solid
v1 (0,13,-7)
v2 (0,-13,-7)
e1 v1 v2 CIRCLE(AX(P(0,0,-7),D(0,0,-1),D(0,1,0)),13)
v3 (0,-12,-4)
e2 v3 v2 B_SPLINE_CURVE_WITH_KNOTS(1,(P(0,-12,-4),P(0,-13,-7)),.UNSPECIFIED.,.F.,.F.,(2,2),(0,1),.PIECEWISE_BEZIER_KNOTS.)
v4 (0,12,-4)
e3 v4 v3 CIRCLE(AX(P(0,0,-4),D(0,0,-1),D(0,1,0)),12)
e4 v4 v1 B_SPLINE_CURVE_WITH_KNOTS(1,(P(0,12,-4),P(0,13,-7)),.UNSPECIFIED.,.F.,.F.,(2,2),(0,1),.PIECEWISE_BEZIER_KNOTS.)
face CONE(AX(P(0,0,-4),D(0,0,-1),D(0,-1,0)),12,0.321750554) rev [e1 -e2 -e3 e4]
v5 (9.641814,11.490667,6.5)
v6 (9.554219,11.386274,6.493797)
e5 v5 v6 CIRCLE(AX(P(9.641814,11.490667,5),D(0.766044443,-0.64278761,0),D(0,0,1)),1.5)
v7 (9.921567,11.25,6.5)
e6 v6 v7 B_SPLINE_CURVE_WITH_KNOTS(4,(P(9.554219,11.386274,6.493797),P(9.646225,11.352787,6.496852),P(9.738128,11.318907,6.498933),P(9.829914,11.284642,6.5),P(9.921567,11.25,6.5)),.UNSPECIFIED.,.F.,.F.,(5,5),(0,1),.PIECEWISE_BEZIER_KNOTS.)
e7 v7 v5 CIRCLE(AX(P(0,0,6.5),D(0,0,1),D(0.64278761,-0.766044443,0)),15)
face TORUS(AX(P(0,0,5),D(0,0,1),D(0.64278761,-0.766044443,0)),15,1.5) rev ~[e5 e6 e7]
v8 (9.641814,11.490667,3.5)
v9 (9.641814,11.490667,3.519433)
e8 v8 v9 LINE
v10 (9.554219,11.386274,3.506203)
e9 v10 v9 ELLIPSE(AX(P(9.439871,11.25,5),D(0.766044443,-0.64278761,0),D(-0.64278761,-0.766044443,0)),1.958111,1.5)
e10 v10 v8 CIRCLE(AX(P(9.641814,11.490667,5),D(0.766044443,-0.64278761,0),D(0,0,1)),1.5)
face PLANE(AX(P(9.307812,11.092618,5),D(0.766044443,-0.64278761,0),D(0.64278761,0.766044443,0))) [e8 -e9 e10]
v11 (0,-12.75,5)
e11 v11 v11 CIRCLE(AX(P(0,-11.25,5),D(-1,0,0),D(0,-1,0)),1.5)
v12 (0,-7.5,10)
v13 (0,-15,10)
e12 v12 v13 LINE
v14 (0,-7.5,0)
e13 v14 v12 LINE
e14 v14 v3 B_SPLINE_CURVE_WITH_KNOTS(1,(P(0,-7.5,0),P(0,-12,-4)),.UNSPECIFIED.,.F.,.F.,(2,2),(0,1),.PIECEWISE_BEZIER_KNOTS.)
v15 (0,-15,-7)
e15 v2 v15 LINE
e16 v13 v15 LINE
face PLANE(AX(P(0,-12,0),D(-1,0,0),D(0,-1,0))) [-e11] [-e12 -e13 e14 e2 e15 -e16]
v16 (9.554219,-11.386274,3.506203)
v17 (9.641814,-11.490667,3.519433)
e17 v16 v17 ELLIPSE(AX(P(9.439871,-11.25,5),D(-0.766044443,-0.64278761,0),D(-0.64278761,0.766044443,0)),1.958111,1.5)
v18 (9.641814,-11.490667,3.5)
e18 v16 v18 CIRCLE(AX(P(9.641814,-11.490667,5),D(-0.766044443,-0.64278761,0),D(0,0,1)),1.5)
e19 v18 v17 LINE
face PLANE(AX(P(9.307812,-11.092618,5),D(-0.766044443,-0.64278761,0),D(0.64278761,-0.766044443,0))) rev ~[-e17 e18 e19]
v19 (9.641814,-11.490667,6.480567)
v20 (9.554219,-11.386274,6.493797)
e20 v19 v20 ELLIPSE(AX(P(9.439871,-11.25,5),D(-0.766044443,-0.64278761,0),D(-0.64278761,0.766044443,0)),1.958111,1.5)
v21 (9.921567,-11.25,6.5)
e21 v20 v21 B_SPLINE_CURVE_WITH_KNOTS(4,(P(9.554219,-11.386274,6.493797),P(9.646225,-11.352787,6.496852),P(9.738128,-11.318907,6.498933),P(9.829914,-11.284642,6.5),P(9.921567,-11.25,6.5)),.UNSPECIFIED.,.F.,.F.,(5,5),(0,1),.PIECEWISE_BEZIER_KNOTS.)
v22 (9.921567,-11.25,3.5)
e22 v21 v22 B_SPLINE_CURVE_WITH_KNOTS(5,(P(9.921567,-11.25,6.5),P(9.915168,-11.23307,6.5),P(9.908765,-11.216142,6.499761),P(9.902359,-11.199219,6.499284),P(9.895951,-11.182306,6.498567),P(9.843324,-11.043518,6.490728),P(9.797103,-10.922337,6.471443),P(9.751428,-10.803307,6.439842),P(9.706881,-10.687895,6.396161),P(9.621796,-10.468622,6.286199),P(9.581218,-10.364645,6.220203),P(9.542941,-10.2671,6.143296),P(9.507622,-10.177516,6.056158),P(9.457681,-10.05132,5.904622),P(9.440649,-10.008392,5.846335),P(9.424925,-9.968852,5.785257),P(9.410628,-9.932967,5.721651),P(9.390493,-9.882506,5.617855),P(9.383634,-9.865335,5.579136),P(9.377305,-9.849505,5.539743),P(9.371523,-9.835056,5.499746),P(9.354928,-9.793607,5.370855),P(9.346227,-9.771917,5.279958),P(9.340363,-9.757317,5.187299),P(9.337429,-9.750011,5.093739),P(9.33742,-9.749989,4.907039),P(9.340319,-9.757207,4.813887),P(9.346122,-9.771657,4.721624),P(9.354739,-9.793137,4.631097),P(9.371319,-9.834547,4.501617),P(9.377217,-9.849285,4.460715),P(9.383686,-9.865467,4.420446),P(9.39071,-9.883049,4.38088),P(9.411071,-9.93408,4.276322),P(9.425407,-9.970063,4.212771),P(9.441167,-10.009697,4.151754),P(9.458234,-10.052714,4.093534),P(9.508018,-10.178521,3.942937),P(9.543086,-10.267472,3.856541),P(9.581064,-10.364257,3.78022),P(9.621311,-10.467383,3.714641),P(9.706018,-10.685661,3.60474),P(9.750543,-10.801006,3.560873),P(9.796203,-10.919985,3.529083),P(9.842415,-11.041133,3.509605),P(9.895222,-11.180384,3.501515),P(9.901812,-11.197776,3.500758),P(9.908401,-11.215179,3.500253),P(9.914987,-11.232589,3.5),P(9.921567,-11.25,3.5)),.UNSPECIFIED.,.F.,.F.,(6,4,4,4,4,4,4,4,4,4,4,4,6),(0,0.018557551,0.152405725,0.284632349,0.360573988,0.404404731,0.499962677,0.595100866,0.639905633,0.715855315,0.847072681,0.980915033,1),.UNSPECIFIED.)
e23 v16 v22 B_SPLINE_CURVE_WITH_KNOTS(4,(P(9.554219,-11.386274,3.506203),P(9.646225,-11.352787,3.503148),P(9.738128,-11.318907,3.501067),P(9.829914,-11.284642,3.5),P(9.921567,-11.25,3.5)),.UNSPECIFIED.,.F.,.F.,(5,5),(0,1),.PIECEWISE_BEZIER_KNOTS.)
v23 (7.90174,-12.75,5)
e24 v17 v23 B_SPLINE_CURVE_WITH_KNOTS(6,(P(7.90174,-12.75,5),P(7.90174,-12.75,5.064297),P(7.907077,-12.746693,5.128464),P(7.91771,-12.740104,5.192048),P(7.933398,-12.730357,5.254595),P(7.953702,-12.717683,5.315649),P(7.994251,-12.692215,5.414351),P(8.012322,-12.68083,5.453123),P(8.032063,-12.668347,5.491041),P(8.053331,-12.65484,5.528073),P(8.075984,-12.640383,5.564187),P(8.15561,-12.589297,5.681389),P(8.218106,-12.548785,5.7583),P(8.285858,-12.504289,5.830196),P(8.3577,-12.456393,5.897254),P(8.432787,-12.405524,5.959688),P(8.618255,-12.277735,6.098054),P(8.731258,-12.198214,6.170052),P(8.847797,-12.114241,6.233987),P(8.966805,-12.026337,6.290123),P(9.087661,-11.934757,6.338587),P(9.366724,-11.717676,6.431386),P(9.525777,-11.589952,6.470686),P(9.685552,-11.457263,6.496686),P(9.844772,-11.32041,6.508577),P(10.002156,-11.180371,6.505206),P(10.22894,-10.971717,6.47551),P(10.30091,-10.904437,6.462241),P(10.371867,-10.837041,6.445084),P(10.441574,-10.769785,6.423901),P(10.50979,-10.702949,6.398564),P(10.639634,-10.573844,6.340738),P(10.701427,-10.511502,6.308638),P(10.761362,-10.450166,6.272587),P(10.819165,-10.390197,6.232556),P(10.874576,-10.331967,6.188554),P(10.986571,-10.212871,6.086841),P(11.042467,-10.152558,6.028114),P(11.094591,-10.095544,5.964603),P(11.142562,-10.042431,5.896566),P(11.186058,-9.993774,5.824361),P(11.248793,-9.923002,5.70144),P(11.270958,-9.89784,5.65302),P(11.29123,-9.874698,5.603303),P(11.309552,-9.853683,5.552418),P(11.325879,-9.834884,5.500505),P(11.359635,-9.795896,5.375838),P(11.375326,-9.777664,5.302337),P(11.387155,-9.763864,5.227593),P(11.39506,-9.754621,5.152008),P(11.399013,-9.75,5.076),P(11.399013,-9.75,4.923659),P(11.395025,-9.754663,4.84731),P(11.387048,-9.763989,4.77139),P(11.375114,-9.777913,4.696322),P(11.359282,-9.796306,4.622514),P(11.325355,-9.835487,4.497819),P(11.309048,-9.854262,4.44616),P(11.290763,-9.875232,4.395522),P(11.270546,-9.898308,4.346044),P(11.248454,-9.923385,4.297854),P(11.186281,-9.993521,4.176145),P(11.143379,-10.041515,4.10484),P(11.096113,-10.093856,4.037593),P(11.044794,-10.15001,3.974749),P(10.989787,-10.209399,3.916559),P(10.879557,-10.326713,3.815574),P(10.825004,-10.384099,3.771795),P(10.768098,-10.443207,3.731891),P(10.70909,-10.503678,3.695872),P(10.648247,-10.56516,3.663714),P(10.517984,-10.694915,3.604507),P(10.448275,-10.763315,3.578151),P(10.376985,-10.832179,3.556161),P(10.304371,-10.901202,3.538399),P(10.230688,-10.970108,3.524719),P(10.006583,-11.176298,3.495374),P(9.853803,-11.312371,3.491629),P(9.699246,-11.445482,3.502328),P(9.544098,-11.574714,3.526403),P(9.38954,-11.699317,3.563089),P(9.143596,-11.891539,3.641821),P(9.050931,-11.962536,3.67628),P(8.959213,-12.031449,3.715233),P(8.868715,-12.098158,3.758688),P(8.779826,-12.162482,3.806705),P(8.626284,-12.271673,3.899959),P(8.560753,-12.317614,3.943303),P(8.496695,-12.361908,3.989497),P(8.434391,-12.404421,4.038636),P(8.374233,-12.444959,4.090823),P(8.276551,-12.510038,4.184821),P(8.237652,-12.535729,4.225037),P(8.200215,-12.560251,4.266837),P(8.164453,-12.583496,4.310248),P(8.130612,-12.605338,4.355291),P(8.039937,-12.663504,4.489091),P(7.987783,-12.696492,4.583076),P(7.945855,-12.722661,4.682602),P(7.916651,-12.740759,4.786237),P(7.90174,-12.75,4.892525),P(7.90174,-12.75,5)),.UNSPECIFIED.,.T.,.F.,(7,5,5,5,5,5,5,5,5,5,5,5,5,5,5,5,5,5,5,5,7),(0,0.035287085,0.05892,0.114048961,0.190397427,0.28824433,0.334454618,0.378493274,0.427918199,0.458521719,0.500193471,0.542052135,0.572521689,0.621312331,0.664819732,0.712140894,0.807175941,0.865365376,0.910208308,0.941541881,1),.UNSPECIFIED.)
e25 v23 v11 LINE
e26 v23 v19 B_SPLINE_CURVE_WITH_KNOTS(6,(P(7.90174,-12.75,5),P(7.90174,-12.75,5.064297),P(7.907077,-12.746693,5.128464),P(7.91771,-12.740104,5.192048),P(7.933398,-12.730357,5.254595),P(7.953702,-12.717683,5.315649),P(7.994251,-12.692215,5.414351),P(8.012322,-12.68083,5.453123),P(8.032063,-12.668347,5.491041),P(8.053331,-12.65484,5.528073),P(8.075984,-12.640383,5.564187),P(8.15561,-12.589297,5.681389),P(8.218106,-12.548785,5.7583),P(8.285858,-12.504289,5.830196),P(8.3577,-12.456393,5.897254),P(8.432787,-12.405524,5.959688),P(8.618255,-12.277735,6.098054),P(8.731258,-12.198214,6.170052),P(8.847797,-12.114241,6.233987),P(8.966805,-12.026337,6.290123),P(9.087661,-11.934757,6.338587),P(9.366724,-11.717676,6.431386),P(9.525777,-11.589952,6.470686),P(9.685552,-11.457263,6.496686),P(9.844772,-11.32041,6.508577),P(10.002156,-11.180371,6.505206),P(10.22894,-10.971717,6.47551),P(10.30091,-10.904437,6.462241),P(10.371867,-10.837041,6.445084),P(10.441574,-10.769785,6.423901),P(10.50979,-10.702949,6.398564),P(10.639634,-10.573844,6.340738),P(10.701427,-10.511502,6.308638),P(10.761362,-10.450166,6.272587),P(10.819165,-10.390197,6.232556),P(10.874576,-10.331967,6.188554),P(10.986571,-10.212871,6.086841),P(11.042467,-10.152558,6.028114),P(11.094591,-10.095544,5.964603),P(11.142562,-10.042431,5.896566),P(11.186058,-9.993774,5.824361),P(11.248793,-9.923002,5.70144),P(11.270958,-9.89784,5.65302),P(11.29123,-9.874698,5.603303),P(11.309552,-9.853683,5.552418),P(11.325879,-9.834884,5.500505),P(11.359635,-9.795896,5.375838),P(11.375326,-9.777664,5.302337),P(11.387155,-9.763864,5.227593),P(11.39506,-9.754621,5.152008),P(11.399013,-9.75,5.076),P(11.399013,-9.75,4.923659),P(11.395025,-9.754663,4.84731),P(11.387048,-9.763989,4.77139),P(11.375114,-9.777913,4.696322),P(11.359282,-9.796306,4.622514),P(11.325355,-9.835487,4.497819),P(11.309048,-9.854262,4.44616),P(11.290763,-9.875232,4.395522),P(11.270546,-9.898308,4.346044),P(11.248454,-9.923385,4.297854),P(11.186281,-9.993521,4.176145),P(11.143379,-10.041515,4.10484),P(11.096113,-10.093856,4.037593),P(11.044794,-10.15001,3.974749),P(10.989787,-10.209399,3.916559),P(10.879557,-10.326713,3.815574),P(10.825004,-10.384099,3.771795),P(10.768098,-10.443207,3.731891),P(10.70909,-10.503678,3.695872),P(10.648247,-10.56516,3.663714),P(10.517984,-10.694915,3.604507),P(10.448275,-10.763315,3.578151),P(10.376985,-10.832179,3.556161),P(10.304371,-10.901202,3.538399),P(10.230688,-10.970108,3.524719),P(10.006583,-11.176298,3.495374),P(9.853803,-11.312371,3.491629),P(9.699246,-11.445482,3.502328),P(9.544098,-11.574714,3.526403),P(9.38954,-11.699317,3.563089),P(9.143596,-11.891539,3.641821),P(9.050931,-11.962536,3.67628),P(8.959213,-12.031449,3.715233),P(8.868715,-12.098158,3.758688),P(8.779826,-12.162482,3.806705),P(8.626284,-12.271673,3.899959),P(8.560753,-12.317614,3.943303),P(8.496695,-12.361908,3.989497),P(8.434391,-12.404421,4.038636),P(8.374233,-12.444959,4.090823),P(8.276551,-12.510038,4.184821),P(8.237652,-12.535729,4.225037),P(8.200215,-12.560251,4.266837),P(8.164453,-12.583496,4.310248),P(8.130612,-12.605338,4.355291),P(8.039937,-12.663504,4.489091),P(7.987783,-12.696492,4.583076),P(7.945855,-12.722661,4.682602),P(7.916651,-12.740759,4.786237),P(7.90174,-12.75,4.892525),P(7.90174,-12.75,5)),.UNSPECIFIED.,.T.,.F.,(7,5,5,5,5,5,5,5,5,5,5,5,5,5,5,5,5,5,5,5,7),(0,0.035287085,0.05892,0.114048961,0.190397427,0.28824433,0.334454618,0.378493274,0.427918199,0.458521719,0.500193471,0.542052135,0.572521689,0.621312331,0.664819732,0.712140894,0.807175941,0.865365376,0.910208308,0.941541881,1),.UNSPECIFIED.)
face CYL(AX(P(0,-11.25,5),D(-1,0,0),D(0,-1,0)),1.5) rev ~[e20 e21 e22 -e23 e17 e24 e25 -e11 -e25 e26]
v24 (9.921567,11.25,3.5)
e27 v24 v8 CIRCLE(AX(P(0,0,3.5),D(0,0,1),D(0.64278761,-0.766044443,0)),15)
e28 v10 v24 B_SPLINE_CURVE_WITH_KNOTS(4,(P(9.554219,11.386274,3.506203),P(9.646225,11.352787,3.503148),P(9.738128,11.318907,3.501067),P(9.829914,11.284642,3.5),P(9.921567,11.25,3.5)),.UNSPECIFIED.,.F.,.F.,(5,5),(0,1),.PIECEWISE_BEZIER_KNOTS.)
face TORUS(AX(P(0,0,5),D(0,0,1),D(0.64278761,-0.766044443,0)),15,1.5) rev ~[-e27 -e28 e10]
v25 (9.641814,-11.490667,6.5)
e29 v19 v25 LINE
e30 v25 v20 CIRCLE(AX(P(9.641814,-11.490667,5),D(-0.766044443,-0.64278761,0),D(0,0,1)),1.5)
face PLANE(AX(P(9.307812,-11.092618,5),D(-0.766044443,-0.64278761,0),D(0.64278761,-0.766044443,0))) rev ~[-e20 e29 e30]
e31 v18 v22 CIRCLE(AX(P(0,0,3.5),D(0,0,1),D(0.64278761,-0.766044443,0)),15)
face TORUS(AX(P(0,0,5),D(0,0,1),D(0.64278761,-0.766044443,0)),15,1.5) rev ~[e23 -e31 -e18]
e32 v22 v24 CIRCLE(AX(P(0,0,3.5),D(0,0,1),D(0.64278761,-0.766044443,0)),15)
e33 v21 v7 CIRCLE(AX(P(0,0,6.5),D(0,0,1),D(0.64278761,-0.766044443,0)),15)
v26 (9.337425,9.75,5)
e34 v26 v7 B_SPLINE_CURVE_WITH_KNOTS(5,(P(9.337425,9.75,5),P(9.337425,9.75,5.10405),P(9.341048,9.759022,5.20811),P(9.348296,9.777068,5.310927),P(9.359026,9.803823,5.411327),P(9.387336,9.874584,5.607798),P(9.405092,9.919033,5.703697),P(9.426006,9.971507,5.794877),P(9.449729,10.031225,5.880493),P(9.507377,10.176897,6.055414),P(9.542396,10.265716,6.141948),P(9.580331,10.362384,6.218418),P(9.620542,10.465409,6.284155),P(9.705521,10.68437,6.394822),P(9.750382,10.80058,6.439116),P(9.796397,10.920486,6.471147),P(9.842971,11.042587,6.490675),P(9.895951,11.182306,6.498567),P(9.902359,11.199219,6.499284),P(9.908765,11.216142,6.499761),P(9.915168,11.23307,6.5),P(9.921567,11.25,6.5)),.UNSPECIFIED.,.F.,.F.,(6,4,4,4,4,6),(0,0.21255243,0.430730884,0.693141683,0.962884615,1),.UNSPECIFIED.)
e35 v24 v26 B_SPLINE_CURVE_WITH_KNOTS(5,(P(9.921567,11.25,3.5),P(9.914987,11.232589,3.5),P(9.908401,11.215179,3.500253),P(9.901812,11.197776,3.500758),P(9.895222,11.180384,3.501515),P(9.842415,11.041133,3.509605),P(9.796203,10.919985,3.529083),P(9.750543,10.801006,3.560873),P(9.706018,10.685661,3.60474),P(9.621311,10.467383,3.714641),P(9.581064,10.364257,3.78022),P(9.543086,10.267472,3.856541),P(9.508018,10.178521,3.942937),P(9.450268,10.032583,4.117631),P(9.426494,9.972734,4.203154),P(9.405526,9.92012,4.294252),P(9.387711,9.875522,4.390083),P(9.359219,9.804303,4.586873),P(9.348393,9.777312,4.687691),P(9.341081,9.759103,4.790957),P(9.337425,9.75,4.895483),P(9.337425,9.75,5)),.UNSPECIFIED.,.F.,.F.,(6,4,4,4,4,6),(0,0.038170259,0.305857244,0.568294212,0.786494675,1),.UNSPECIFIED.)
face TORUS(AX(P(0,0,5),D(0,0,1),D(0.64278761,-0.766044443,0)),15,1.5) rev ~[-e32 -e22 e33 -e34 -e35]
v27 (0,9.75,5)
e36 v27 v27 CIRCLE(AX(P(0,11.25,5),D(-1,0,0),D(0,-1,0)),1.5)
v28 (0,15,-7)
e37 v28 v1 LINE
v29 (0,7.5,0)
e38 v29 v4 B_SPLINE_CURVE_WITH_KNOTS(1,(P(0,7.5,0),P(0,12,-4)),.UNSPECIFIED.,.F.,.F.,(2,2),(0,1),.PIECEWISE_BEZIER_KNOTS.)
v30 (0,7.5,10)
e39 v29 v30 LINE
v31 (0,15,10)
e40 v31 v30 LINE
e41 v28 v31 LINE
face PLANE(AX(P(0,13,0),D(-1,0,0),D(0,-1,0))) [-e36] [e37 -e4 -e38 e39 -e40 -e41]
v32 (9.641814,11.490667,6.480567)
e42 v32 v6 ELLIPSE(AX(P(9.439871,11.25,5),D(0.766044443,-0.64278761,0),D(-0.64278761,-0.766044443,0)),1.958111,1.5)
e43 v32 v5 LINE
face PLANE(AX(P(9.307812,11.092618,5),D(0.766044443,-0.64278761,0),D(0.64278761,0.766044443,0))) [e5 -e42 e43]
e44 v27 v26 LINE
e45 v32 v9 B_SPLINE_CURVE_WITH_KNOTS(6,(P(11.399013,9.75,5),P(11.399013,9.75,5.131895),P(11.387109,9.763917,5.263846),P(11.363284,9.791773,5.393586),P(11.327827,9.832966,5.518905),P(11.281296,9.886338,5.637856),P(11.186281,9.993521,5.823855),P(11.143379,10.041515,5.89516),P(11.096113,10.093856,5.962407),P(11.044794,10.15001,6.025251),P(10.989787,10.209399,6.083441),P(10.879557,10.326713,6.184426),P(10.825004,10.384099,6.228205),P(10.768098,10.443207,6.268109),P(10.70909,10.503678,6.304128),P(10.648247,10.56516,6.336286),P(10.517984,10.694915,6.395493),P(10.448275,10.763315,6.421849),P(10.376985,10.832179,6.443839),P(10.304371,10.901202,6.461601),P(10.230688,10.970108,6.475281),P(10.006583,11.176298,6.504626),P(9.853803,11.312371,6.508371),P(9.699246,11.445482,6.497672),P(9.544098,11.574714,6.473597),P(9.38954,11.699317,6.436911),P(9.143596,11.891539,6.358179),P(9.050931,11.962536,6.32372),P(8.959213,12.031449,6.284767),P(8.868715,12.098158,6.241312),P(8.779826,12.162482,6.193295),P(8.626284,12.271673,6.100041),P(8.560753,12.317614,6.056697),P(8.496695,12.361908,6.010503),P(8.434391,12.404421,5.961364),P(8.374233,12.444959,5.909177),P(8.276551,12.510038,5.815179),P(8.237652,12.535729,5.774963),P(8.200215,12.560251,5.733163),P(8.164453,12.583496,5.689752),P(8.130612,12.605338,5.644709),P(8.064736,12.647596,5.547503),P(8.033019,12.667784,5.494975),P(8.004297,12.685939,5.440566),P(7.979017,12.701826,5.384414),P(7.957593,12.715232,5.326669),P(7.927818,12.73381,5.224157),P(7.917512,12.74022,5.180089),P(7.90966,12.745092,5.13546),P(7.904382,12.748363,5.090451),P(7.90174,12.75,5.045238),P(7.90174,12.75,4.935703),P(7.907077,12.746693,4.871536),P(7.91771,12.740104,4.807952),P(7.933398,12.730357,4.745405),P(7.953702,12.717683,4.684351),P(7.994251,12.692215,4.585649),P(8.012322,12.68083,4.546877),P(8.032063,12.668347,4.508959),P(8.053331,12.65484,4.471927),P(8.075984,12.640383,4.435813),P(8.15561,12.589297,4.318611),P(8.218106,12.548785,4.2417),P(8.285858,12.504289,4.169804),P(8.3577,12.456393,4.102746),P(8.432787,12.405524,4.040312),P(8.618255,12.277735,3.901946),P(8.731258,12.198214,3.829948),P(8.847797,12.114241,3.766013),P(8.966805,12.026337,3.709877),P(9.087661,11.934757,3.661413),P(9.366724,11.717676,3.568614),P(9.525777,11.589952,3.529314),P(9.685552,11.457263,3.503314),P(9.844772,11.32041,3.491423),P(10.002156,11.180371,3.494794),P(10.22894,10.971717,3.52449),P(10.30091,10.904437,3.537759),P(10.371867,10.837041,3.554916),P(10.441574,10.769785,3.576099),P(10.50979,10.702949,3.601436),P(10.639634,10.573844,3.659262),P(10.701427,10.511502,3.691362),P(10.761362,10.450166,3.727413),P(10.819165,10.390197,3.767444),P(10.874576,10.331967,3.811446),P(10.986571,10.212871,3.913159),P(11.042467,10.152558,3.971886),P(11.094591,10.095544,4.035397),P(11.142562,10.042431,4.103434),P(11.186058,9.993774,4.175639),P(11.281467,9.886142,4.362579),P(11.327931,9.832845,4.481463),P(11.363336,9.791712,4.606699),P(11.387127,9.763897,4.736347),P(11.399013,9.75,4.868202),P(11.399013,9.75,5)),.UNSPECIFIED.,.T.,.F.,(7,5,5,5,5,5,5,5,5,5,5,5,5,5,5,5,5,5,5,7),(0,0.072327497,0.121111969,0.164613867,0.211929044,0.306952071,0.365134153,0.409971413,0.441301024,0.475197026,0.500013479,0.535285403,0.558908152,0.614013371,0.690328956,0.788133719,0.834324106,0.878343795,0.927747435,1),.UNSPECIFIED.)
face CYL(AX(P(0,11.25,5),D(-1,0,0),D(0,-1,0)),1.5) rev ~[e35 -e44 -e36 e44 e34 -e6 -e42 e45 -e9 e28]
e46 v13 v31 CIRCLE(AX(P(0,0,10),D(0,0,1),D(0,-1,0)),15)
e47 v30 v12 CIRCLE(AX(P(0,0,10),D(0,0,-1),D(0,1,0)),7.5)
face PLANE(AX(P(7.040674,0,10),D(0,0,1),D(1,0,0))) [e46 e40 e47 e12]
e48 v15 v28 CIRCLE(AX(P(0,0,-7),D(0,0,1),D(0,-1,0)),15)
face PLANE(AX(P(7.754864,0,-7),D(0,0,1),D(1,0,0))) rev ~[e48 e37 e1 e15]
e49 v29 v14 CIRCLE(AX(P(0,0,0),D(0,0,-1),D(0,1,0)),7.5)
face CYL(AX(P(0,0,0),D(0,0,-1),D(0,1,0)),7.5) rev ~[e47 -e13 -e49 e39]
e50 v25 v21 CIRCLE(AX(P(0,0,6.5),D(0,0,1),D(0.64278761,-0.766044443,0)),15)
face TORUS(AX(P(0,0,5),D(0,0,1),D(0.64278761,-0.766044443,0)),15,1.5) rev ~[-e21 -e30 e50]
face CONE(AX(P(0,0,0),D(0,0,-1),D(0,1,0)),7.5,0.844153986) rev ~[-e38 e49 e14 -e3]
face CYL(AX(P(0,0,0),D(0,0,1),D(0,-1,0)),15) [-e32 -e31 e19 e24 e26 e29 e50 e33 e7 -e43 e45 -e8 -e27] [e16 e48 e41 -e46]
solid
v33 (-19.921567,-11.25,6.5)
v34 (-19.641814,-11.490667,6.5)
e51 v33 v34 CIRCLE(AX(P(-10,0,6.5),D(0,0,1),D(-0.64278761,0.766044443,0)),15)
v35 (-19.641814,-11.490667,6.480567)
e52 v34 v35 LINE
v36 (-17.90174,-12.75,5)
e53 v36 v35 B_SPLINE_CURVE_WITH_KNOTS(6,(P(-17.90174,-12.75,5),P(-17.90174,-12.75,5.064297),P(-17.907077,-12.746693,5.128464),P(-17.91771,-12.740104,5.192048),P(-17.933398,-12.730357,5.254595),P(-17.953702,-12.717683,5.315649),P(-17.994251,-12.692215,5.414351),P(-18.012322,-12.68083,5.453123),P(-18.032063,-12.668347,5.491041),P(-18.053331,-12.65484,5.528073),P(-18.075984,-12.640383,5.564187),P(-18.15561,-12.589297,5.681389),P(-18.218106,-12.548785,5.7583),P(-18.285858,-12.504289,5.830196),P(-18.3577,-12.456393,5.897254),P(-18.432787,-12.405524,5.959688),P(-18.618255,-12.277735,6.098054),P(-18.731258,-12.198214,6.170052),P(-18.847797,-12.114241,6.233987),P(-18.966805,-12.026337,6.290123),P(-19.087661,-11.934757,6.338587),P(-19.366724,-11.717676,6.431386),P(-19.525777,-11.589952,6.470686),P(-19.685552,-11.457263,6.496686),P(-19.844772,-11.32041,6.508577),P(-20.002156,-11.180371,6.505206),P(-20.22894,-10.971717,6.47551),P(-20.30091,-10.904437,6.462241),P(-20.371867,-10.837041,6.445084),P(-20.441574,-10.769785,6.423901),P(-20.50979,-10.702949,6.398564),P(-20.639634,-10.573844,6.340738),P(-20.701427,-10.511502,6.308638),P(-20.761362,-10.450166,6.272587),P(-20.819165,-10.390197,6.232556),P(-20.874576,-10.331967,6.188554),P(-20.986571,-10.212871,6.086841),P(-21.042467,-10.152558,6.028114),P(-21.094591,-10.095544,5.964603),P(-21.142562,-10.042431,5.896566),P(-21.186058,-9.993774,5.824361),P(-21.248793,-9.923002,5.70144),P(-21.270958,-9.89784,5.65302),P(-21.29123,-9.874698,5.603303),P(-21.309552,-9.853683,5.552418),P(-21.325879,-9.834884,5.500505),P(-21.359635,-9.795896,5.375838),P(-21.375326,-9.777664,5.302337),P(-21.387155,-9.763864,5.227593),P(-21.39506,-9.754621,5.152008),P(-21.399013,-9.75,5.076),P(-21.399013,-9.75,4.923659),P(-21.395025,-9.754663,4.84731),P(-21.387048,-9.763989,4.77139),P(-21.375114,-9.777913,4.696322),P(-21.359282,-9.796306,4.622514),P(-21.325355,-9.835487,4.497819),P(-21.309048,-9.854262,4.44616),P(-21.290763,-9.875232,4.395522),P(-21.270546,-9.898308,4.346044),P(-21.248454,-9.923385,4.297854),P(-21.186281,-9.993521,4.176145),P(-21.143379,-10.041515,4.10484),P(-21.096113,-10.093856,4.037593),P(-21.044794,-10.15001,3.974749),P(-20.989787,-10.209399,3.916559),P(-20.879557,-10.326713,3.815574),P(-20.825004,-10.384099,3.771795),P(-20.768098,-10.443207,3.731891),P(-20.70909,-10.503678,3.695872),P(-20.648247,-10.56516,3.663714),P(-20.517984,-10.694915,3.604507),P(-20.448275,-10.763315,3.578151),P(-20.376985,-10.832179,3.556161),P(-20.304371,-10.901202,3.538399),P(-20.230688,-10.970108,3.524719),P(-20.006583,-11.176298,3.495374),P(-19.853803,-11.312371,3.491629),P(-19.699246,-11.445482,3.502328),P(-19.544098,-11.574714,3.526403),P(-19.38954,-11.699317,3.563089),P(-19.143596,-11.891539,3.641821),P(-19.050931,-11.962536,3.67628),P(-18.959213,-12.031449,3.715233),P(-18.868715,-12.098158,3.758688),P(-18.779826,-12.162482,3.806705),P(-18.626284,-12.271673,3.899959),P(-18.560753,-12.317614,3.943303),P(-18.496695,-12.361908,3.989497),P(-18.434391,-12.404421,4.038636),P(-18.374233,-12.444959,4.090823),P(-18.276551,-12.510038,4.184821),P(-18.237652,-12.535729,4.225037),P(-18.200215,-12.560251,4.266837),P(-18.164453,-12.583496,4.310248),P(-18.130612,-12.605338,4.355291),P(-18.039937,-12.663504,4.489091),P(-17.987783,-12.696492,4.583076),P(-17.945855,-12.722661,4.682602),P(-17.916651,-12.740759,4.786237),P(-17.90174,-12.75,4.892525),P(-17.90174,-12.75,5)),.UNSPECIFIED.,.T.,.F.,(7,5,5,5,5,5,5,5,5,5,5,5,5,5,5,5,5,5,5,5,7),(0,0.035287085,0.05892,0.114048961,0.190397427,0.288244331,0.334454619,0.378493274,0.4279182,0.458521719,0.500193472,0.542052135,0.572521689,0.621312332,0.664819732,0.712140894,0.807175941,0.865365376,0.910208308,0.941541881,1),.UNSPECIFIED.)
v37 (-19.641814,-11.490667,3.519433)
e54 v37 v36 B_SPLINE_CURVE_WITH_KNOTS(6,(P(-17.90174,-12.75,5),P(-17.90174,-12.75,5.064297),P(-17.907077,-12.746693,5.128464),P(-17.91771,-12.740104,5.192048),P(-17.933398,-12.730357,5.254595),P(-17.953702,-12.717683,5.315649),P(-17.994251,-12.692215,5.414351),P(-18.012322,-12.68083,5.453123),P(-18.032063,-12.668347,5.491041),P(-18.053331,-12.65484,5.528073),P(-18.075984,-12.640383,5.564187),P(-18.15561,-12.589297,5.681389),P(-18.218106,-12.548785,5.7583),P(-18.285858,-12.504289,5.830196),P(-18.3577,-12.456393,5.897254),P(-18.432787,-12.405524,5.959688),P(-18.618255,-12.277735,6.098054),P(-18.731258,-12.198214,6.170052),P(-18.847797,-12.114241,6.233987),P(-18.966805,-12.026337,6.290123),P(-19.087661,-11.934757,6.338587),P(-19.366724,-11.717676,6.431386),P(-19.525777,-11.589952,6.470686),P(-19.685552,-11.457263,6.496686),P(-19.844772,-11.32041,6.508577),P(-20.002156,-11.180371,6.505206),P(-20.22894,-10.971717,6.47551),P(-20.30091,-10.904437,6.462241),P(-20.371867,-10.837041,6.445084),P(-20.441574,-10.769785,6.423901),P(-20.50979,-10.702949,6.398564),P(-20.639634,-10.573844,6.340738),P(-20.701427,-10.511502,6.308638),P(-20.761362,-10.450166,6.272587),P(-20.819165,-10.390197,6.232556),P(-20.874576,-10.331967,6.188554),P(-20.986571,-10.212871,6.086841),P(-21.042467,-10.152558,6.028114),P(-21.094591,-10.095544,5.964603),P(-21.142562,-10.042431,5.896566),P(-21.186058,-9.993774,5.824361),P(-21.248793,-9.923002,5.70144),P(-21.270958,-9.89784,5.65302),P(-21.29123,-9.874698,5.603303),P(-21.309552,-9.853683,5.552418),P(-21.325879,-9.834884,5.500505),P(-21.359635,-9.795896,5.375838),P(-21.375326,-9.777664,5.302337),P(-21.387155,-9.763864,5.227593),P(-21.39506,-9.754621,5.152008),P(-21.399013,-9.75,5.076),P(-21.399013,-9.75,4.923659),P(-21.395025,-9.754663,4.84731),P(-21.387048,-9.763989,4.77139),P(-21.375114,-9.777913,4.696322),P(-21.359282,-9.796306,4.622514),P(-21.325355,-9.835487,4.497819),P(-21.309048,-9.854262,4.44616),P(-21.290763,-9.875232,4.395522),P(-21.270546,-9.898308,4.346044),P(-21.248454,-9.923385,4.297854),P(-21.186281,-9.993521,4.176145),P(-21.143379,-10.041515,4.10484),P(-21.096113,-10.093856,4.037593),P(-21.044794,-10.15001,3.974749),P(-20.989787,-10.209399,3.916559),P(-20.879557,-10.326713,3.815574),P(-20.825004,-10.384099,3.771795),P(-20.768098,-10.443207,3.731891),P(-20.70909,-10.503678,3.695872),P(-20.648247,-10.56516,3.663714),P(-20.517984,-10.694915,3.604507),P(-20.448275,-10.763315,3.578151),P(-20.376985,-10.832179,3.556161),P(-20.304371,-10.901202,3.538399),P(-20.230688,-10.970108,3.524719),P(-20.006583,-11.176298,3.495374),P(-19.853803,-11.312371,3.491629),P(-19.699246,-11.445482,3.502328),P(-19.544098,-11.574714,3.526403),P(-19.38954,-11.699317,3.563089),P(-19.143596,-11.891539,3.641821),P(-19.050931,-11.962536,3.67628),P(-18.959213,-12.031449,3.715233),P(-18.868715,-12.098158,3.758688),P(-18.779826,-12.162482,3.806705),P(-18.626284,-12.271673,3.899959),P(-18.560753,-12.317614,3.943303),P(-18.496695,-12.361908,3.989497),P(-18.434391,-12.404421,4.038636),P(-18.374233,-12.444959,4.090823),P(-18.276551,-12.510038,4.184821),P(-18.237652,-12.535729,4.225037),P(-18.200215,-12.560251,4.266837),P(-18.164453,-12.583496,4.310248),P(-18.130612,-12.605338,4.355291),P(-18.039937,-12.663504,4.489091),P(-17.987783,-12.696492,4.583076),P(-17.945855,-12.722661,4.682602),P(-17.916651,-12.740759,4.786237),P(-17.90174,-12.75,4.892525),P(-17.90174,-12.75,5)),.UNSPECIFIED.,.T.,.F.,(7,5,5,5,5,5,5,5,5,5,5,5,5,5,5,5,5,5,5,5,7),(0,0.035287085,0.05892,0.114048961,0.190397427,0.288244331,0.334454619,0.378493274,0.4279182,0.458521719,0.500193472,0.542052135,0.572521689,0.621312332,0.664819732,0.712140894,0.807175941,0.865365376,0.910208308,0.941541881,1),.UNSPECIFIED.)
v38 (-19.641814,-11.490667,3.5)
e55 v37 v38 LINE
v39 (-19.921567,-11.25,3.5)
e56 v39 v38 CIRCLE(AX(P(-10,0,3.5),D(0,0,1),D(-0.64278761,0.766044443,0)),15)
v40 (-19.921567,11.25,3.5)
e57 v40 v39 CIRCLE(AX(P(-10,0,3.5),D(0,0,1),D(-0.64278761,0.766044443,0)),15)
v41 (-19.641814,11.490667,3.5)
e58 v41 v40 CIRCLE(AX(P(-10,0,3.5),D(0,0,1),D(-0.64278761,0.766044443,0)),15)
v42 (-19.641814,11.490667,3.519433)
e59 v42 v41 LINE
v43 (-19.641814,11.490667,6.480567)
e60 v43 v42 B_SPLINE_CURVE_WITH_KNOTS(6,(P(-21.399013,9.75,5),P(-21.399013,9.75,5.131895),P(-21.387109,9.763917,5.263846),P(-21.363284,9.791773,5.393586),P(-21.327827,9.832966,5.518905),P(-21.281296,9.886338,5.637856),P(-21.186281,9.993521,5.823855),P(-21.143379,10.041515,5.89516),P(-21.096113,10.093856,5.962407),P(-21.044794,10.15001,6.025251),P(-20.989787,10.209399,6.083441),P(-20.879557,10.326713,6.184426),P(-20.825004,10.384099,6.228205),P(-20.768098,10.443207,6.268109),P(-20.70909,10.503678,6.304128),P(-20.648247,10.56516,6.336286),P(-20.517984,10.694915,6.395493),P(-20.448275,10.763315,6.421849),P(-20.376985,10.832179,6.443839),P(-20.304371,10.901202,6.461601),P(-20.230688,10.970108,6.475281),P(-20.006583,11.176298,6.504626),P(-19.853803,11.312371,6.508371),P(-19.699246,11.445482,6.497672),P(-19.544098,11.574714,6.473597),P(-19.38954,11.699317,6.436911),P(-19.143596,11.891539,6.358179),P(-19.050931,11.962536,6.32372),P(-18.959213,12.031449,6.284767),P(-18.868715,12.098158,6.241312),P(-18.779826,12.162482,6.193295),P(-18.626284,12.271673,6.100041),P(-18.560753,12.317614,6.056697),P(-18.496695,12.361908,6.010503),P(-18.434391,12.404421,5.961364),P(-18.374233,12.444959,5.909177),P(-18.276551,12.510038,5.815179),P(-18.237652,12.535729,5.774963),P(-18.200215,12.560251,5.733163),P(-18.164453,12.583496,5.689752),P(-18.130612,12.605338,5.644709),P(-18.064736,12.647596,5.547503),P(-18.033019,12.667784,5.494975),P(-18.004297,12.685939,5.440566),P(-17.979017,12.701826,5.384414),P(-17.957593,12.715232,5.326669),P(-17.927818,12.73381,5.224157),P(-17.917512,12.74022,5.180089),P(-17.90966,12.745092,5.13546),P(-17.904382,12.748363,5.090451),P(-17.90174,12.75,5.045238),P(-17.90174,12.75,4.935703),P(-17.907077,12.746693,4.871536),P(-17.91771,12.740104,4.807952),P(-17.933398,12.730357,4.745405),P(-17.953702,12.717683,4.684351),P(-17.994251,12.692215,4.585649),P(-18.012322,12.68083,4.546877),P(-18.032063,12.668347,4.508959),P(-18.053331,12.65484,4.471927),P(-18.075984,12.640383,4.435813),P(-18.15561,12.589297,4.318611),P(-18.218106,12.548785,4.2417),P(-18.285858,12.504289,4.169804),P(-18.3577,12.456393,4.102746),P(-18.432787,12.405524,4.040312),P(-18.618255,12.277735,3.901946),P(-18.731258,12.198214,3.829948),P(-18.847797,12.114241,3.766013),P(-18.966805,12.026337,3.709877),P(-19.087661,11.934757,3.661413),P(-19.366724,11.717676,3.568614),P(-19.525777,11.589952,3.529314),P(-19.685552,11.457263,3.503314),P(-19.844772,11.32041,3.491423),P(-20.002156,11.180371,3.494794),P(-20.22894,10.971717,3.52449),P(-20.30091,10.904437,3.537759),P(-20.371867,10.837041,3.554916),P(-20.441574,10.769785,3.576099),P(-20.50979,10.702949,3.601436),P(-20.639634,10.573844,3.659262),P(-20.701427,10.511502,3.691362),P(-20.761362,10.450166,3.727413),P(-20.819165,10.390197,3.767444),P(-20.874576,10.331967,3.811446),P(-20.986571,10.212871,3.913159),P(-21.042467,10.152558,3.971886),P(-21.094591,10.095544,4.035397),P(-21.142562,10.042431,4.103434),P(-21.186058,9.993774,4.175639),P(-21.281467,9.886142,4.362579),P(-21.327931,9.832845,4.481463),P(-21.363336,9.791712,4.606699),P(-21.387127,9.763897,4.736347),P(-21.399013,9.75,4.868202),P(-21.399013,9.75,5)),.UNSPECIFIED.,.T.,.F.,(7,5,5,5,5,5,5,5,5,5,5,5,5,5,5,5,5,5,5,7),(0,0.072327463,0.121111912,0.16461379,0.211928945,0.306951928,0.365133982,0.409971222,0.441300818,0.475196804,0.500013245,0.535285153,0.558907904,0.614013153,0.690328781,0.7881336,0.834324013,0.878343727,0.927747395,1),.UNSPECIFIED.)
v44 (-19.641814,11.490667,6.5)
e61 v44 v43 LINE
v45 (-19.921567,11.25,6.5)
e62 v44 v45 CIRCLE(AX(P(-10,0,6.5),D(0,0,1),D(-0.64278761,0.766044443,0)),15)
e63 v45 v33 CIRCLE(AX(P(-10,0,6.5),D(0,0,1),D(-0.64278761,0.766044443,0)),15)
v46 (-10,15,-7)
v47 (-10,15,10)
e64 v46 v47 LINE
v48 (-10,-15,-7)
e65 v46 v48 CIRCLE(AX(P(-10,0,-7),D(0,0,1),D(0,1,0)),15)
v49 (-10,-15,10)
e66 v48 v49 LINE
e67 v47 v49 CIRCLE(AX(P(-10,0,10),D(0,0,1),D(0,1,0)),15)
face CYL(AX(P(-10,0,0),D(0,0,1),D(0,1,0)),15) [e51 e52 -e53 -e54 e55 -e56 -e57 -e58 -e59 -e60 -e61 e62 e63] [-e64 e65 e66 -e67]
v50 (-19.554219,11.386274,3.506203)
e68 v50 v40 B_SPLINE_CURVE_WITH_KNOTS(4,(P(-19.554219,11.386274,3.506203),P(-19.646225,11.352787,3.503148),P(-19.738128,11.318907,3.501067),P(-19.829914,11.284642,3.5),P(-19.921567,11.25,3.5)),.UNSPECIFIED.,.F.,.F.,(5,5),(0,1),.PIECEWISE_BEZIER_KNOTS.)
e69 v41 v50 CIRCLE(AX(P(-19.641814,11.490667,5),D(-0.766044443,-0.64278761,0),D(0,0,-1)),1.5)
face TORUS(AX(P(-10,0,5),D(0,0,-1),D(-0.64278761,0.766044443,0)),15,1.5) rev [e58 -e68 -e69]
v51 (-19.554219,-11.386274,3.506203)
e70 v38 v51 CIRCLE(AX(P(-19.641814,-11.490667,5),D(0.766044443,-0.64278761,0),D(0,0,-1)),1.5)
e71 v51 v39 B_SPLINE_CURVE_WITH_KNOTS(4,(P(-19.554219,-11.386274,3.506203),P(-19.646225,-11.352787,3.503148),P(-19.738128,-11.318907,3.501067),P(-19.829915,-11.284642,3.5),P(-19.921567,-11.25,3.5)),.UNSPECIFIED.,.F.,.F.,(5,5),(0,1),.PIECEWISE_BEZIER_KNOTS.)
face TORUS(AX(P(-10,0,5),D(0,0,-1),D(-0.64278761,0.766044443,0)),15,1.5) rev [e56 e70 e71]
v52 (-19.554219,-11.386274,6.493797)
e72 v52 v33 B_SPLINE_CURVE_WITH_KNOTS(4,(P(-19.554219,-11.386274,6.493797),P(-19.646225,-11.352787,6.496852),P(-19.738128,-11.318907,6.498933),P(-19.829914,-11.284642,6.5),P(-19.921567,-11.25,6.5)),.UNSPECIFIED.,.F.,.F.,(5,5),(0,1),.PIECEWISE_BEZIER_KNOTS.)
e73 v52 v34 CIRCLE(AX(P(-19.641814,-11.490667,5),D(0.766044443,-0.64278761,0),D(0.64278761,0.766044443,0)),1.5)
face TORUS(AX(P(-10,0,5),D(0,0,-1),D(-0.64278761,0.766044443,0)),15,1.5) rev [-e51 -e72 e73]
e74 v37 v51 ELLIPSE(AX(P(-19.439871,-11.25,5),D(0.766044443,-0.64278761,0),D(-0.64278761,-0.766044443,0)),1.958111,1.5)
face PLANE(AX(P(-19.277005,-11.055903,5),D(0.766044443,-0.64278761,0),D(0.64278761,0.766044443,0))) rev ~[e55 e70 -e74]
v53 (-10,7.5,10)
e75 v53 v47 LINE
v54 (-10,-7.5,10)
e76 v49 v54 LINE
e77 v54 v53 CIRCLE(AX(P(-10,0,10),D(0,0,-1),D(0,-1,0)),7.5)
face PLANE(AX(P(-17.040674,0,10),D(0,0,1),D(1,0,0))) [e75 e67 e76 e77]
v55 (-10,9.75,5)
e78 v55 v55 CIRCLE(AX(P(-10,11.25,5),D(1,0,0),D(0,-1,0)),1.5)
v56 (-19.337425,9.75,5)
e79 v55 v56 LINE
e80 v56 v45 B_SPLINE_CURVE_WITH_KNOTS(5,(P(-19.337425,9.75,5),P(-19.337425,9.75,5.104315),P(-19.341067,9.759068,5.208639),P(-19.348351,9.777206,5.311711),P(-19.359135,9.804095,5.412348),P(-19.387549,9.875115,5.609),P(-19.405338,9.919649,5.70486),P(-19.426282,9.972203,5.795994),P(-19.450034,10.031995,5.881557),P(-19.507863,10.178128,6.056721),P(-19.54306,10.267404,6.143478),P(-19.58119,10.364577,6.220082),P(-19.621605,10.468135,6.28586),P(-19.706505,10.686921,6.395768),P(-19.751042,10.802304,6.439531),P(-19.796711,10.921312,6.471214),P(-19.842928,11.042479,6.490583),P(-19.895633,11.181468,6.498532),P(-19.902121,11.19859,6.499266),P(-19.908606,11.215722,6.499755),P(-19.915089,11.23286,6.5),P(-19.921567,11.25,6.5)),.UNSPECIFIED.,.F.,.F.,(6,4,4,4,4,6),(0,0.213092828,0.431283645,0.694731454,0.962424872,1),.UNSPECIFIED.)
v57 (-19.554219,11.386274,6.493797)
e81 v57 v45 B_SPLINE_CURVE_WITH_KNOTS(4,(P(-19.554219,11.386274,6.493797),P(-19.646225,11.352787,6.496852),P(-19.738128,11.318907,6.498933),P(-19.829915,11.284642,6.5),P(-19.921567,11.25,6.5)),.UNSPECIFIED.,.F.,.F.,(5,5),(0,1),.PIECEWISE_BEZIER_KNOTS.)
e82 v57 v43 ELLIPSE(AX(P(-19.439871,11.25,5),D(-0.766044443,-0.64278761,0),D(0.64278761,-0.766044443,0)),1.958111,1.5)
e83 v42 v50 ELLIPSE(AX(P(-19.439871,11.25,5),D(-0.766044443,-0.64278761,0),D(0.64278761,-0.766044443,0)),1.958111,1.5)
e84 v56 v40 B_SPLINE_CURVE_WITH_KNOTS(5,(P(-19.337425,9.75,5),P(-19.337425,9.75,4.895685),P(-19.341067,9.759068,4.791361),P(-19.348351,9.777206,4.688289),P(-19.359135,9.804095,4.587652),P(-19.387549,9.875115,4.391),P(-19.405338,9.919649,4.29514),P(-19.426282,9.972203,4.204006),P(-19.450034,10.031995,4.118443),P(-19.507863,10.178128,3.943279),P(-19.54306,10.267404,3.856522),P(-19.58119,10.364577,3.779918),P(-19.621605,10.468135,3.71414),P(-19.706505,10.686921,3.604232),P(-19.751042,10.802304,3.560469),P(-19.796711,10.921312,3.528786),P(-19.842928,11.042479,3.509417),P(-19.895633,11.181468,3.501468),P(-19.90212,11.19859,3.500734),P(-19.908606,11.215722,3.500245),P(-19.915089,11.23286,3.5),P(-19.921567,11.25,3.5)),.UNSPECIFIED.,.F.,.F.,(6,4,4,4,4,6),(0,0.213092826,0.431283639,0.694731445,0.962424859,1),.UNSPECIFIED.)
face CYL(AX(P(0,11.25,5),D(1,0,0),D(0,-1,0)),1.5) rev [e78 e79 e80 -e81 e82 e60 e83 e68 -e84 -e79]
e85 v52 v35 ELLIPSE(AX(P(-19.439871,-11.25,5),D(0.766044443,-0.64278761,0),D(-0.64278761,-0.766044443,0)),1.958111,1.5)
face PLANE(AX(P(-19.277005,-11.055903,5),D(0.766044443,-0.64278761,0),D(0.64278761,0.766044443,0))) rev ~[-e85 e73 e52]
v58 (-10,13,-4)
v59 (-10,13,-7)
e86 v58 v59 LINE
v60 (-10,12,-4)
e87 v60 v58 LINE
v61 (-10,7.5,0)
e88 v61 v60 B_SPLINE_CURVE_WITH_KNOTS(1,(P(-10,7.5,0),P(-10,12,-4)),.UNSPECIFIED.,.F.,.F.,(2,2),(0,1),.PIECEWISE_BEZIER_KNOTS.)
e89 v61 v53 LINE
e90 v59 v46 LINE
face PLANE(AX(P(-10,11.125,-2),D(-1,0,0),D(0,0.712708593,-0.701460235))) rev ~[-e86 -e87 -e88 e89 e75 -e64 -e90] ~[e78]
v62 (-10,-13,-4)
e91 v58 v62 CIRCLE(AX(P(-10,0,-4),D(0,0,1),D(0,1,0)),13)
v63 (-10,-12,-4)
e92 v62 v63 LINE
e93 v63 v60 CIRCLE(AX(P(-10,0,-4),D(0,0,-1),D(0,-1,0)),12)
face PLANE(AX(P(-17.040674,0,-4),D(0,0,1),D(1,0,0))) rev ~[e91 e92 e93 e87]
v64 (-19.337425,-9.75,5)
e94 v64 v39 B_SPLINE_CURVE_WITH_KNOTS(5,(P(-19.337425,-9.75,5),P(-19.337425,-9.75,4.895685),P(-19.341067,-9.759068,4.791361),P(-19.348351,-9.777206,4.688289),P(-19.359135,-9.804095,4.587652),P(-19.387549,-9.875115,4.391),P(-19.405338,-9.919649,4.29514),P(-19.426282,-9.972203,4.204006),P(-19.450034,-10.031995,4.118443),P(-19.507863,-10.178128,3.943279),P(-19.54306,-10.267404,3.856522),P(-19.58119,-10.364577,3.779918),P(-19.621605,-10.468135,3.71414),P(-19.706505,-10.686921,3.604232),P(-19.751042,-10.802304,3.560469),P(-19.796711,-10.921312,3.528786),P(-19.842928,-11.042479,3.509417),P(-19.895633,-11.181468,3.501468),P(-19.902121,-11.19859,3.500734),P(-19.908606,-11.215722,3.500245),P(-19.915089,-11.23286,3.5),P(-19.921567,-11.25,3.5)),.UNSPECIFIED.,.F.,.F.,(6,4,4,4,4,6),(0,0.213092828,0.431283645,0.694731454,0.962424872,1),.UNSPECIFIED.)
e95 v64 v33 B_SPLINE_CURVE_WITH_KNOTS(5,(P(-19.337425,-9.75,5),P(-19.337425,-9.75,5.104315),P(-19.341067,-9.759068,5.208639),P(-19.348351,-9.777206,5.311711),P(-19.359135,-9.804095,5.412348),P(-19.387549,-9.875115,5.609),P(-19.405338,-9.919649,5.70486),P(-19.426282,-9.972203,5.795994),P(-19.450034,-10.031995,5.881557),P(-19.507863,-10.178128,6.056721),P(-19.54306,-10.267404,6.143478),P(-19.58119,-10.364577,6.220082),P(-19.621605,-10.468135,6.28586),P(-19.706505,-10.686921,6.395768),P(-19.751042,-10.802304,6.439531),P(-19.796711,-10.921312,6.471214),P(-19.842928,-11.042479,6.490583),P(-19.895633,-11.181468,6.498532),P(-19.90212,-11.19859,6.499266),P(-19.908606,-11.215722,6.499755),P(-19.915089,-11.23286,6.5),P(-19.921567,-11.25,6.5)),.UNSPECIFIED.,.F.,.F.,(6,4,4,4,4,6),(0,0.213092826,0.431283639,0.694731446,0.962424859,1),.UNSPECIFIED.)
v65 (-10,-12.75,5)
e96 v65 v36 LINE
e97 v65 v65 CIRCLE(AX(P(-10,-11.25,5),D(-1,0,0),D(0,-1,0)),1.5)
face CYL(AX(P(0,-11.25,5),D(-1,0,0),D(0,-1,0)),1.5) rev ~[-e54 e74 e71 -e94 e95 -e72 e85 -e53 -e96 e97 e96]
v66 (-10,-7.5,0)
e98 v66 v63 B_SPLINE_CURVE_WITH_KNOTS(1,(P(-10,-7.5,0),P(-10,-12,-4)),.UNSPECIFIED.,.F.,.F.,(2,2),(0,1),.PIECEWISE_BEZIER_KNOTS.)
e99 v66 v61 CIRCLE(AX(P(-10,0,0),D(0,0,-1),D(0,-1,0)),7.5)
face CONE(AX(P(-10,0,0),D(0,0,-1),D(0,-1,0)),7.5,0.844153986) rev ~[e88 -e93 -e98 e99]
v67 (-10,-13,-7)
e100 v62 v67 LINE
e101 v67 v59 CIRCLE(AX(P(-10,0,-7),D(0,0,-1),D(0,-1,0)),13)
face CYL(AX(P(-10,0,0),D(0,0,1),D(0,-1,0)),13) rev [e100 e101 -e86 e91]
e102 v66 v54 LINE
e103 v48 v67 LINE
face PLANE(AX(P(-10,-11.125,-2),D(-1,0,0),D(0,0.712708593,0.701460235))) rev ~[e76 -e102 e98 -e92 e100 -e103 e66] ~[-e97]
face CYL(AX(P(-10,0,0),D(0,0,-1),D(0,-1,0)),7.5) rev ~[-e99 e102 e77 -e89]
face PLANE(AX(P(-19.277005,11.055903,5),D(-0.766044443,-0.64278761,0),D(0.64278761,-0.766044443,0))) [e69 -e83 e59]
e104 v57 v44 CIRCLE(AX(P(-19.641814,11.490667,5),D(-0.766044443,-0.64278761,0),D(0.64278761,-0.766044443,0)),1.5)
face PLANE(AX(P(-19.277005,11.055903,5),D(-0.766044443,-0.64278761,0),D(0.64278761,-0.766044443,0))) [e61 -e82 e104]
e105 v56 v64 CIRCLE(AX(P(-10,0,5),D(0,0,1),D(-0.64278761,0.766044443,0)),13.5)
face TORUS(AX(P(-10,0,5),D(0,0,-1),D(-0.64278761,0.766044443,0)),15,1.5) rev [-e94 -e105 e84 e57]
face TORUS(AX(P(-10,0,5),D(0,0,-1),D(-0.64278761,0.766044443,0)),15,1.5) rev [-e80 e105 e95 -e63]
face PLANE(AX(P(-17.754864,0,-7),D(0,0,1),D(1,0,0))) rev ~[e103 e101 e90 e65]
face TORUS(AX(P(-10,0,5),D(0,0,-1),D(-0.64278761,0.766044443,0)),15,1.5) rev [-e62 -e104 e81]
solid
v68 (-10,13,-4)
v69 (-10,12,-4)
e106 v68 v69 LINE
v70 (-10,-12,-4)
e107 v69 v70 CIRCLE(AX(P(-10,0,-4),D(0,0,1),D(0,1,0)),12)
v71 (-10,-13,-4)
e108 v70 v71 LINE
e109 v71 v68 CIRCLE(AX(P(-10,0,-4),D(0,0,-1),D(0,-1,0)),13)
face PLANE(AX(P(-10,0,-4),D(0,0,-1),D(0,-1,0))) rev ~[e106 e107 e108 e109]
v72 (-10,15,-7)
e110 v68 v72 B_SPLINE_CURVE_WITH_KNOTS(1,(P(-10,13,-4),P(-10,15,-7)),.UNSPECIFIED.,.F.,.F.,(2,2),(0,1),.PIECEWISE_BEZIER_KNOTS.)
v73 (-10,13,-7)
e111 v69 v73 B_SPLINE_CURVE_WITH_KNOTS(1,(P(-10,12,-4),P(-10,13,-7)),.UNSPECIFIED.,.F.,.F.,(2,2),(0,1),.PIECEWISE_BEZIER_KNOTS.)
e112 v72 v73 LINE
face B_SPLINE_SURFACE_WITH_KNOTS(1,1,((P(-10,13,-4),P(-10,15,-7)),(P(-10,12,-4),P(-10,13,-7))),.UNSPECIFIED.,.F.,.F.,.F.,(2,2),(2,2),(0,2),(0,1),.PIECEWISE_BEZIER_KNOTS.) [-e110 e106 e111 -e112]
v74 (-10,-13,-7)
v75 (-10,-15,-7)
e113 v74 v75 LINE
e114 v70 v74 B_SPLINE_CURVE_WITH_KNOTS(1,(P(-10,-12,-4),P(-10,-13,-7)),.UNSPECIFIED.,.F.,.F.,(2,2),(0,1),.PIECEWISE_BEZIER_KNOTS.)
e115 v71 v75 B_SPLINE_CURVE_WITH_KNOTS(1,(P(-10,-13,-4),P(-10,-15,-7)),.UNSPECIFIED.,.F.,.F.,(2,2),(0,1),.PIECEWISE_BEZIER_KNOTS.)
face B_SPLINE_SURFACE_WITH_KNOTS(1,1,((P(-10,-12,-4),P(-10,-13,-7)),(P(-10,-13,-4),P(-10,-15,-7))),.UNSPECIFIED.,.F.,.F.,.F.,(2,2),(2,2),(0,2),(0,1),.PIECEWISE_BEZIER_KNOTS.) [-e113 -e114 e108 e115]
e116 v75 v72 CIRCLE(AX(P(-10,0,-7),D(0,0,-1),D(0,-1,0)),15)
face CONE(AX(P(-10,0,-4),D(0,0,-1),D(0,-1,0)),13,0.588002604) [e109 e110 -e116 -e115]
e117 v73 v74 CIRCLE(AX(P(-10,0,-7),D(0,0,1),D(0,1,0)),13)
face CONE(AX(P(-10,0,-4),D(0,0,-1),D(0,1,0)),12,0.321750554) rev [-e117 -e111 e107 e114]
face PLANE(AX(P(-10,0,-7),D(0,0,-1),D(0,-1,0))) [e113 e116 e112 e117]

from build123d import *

# Parameters (mm, degrees)
F1_DEPTH       = 10
F3_R           = 1.5
F4_DEPTH       = 25
F5_ANGLE_START = 40
F5_ANGLE       = 100
F7_ANGLE_START = 220
F7_ANGLE       = 100
F8_DEPTH       = 7
F9_DEPTH       = 4


with BuildPart() as f1:
    # F0 (on Top) → F1 (new body)
    with BuildSketch(Plane.XY):
        with BuildLine():
            Line((-10, 12), (-10, 13))
            ThreePointArc((-10, 13), (-23, 0), (-10, -13))
            Line((-10, -13), (-10, -12))
            ThreePointArc((-10, -12), (-22, 0), (-10, 12))
        make_face()
        with BuildLine():
            Line((-10, 7.5), (-10, 12))
            ThreePointArc((-10, 12), (-22, 0), (-10, -12))
            Line((-10, -12), (-10, -7.5))
            ThreePointArc((-10, -7.5), (-17.5, 0), (-10, 7.5))
        make_face()
        with BuildLine():
            Line((-10, 13), (-10, 15))
            ThreePointArc((-10, 15), (-25, 0), (-10, -15))
            Line((-10, -15), (-10, -13))
            ThreePointArc((-10, -13), (-23, 0), (-10, 13))
        make_face()
    extrude(amount=F1_DEPTH)


with BuildPart() as f1b:
    # F0 (on Top) → F1, piece 2 (new body)
    with BuildSketch(Plane.XY):
        with BuildLine():
            ThreePointArc((0, -13), (13, 0), (0, 13))
            Line((0, 13), (0, 12))
            ThreePointArc((0, 12), (12, 0), (0, -12))
            Line((0, -12), (0, -13))
        make_face()
        with BuildLine():
            ThreePointArc((0, -12), (12, 0), (0, 12))
            Line((0, 12), (0, 7.5))
            ThreePointArc((0, 7.5), (7.5, 0), (0, -7.5))
            Line((0, -7.5), (0, -12))
        make_face()
        with BuildLine():
            ThreePointArc((0, -15), (15, 0), (0, 15))
            Line((0, 15), (0, 13))
            ThreePointArc((0, 13), (13, 0), (0, -13))
            Line((0, -13), (0, -15))
        make_face()
    extrude(amount=F1_DEPTH)


with BuildPart() as f4_tool:
    # F3 (on face) → F4 (new body, symmetric)
    with BuildSketch(Plane(origin=(0, 0, 0), x_dir=(0, -1, 0), z_dir=(-1, 0, 0))):
        with Locations((-11.25, 5)):
            Circle(F3_R)
        with Locations((11.25, 5)):
            Circle(F3_R)
    extrude(amount=F4_DEPTH, both=True)


with BuildPart() as f1_1:
    add(f1.part)

    # F4: cut by f4_tool
    add(f4_tool.part, mode=Mode.SUBTRACT)

    # F6 (on face) → F7 (revolve, cut)
    with BuildSketch(Plane.YZ.offset(-10), mode=Mode.PRIVATE) as f7_sk:
        with BuildLine():
            ThreePointArc((-15, 3.5), (-13.9393398282, 3.9393398282), (-13.5, 5))
            ThreePointArc((-13.5, 5), (-13.9393398282, 6.0606601718), (-15, 6.5))
            Line((-15, 6.5), (-15, 3.5))
        make_face()
    revolve(f7_sk.sketch.rotate(Axis((-10, 0, 6.8141282536), (0, 0, 1)), F7_ANGLE_START), axis=Axis((-10, 0, 6.8141282536), (0, 0, 1)), revolution_arc=F7_ANGLE, mode=Mode.SUBTRACT)

    # F0 (on Top) → F8, piece 2 (join)
    with BuildSketch(Plane.XY):
        with BuildLine():
            Line((-10, 13), (-10, 15))
            ThreePointArc((-10, 15), (-25, 0), (-10, -15))
            Line((-10, -15), (-10, -13))
            ThreePointArc((-10, -13), (-23, 0), (-10, 13))
        make_face()
    extrude(amount=-F8_DEPTH)

    # F0 (on Top) → F9, piece 2 (join)
    with BuildSketch(Plane.XY):
        with BuildLine():
            Line((-10, 12), (-10, 13))
            ThreePointArc((-10, 13), (-23, 0), (-10, -13))
            Line((-10, -13), (-10, -12))
            ThreePointArc((-10, -12), (-22, 0), (-10, 12))
        make_face()
    extrude(amount=-F9_DEPTH)

    # F0 (on Top) → F11 section 0
    with BuildSketch(Plane.XY):
        with BuildLine():
            Line((-10, 7.5), (-10, 12))
            ThreePointArc((-10, 12), (-22, 0), (-10, -12))
            Line((-10, -12), (-10, -7.5))
            ThreePointArc((-10, -7.5), (-17.5, 0), (-10, 7.5))
        make_face()
    # F9_face (on face) → F11 section 1
    with BuildSketch(Plane(origin=(7.9619912864, 0, -4), x_dir=(1, 0, 0), z_dir=(0, 0, -1))):
        with BuildLine():
            Line((-17.9619912864, 12), (-17.9619912864, 13))
            ThreePointArc((-17.9619912864, 13), (-30.9619912864, 0), (-17.9619912864, -13))
            Line((-17.9619912864, -13), (-17.9619912864, -12))
            ThreePointArc((-17.9619912864, -12), (-29.9619912864, 0), (-17.9619912864, 12))
        make_face()
    loft()


with BuildPart() as f1b_1:
    add(f1b.part)

    # F4: cut by f4_tool
    add(f4_tool.part, mode=Mode.SUBTRACT)

    # F3 (on face) → F5 (revolve, cut)
    with BuildSketch(Plane(origin=(0, 0, 0), x_dir=(0, -1, 0), z_dir=(-1, 0, 0)), mode=Mode.PRIVATE) as f5_sk:
        with BuildLine():
            Line((15, 3.5), (15, 6.5))
            ThreePointArc((15, 6.5), (13.5, 5), (15, 3.5))
        make_face()
    revolve(f5_sk.sketch.rotate(Axis((0, 0, 4.2424267518), (0, 0, 1)), F5_ANGLE_START), axis=Axis((0, 0, 4.2424267518), (0, 0, 1)), revolution_arc=F5_ANGLE, mode=Mode.SUBTRACT)

    # F0 (on Top) → F8 (join)
    with BuildSketch(Plane.XY):
        with BuildLine():
            ThreePointArc((0, -15), (15, 0), (0, 15))
            Line((0, 15), (0, 13))
            ThreePointArc((0, 13), (13, 0), (0, -13))
            Line((0, -13), (0, -15))
        make_face()
    extrude(amount=-F8_DEPTH)

    # F0 (on Top) → F9 (join)
    with BuildSketch(Plane.XY):
        with BuildLine():
            ThreePointArc((0, -13), (13, 0), (0, 13))
            Line((0, 13), (0, 12))
            ThreePointArc((0, 12), (12, 0), (0, -12))
            Line((0, -12), (0, -13))
        make_face()
    extrude(amount=-F9_DEPTH)

    # F0 (on Top) → F10 section 0
    with BuildSketch(Plane.XY):
        with BuildLine():
            ThreePointArc((0, -12), (12, 0), (0, 12))
            Line((0, 12), (0, 7.5))
            ThreePointArc((0, 7.5), (7.5, 0), (0, -7.5))
            Line((0, -7.5), (0, -12))
        make_face()
    # F9_face (on face) → F10 section 1
    with BuildSketch(Plane(origin=(7.9619912864, 0, -4), x_dir=(1, 0, 0), z_dir=(0, 0, -1))):
        with BuildLine():
            Line((-7.9619912864, -12), (-7.9619912864, -13))
            ThreePointArc((-7.9619912864, -13), (5.0380087136, 0), (-7.9619912864, 13))
            Line((-7.9619912864, 13), (-7.9619912864, 12))
            ThreePointArc((-7.9619912864, 12), (4.0380087136, 0), (-7.9619912864, -12))
        make_face()
    loft()

    # F9_face (on face) → F12 section 0
    with BuildSketch(Plane(origin=(7.9619912864, 0, -4), x_dir=(1, 0, 0), z_dir=(0, 0, -1))):
        with BuildLine():
            Line((-7.9619912864, -12), (-7.9619912864, -13))
            ThreePointArc((-7.9619912864, -13), (5.0380087136, 0), (-7.9619912864, 13))
            Line((-7.9619912864, 13), (-7.9619912864, 12))
            ThreePointArc((-7.9619912864, 12), (4.0380087136, 0), (-7.9619912864, -12))
        make_face()
    # F8_face (on face) → F12 section 1
    with BuildSketch(Plane(origin=(8.9278344268, 0, -7), x_dir=(1, 0, 0), z_dir=(0, 0, -1))):
        with BuildLine():
            Line((-8.9278344268, -13), (-8.9278344268, -15))
            ThreePointArc((-8.9278344268, -15), (6.0721655732, 0), (-8.9278344268, 15))
            Line((-8.9278344268, 15), (-8.9278344268, 13))
            ThreePointArc((-8.9278344268, 13), (4.0721655732, 0), (-8.9278344268, -13))
        make_face()
    loft()


with BuildPart() as f13:
    # F9_face (on face) → F13 section 0
    with BuildSketch(Plane(origin=(7.9619912864, 0, -4), x_dir=(1, 0, 0), z_dir=(0, 0, -1))):
        with BuildLine():
            Line((-17.9619912864, 12), (-17.9619912864, 13))
            ThreePointArc((-17.9619912864, 13), (-30.9619912864, 0), (-17.9619912864, -13))
            Line((-17.9619912864, -13), (-17.9619912864, -12))
            ThreePointArc((-17.9619912864, -12), (-29.9619912864, 0), (-17.9619912864, 12))
        make_face()
    # F8_face (on face) → F13 section 1
    with BuildSketch(Plane(origin=(8.9278344268, 0, -7), x_dir=(1, 0, 0), z_dir=(0, 0, -1))):
        with BuildLine():
            Line((-18.9278344268, 13), (-18.9278344268, 15))
            ThreePointArc((-18.9278344268, 15), (-33.9278344268, 0), (-18.9278344268, -15))
            Line((-18.9278344268, -15), (-18.9278344268, -13))
            ThreePointArc((-18.9278344268, -13), (-31.9278344268, 0), (-18.9278344268, 13))
        make_face()
    loft()


solid = Compound([f1_1.part, f1b_1.part, f13.part])
